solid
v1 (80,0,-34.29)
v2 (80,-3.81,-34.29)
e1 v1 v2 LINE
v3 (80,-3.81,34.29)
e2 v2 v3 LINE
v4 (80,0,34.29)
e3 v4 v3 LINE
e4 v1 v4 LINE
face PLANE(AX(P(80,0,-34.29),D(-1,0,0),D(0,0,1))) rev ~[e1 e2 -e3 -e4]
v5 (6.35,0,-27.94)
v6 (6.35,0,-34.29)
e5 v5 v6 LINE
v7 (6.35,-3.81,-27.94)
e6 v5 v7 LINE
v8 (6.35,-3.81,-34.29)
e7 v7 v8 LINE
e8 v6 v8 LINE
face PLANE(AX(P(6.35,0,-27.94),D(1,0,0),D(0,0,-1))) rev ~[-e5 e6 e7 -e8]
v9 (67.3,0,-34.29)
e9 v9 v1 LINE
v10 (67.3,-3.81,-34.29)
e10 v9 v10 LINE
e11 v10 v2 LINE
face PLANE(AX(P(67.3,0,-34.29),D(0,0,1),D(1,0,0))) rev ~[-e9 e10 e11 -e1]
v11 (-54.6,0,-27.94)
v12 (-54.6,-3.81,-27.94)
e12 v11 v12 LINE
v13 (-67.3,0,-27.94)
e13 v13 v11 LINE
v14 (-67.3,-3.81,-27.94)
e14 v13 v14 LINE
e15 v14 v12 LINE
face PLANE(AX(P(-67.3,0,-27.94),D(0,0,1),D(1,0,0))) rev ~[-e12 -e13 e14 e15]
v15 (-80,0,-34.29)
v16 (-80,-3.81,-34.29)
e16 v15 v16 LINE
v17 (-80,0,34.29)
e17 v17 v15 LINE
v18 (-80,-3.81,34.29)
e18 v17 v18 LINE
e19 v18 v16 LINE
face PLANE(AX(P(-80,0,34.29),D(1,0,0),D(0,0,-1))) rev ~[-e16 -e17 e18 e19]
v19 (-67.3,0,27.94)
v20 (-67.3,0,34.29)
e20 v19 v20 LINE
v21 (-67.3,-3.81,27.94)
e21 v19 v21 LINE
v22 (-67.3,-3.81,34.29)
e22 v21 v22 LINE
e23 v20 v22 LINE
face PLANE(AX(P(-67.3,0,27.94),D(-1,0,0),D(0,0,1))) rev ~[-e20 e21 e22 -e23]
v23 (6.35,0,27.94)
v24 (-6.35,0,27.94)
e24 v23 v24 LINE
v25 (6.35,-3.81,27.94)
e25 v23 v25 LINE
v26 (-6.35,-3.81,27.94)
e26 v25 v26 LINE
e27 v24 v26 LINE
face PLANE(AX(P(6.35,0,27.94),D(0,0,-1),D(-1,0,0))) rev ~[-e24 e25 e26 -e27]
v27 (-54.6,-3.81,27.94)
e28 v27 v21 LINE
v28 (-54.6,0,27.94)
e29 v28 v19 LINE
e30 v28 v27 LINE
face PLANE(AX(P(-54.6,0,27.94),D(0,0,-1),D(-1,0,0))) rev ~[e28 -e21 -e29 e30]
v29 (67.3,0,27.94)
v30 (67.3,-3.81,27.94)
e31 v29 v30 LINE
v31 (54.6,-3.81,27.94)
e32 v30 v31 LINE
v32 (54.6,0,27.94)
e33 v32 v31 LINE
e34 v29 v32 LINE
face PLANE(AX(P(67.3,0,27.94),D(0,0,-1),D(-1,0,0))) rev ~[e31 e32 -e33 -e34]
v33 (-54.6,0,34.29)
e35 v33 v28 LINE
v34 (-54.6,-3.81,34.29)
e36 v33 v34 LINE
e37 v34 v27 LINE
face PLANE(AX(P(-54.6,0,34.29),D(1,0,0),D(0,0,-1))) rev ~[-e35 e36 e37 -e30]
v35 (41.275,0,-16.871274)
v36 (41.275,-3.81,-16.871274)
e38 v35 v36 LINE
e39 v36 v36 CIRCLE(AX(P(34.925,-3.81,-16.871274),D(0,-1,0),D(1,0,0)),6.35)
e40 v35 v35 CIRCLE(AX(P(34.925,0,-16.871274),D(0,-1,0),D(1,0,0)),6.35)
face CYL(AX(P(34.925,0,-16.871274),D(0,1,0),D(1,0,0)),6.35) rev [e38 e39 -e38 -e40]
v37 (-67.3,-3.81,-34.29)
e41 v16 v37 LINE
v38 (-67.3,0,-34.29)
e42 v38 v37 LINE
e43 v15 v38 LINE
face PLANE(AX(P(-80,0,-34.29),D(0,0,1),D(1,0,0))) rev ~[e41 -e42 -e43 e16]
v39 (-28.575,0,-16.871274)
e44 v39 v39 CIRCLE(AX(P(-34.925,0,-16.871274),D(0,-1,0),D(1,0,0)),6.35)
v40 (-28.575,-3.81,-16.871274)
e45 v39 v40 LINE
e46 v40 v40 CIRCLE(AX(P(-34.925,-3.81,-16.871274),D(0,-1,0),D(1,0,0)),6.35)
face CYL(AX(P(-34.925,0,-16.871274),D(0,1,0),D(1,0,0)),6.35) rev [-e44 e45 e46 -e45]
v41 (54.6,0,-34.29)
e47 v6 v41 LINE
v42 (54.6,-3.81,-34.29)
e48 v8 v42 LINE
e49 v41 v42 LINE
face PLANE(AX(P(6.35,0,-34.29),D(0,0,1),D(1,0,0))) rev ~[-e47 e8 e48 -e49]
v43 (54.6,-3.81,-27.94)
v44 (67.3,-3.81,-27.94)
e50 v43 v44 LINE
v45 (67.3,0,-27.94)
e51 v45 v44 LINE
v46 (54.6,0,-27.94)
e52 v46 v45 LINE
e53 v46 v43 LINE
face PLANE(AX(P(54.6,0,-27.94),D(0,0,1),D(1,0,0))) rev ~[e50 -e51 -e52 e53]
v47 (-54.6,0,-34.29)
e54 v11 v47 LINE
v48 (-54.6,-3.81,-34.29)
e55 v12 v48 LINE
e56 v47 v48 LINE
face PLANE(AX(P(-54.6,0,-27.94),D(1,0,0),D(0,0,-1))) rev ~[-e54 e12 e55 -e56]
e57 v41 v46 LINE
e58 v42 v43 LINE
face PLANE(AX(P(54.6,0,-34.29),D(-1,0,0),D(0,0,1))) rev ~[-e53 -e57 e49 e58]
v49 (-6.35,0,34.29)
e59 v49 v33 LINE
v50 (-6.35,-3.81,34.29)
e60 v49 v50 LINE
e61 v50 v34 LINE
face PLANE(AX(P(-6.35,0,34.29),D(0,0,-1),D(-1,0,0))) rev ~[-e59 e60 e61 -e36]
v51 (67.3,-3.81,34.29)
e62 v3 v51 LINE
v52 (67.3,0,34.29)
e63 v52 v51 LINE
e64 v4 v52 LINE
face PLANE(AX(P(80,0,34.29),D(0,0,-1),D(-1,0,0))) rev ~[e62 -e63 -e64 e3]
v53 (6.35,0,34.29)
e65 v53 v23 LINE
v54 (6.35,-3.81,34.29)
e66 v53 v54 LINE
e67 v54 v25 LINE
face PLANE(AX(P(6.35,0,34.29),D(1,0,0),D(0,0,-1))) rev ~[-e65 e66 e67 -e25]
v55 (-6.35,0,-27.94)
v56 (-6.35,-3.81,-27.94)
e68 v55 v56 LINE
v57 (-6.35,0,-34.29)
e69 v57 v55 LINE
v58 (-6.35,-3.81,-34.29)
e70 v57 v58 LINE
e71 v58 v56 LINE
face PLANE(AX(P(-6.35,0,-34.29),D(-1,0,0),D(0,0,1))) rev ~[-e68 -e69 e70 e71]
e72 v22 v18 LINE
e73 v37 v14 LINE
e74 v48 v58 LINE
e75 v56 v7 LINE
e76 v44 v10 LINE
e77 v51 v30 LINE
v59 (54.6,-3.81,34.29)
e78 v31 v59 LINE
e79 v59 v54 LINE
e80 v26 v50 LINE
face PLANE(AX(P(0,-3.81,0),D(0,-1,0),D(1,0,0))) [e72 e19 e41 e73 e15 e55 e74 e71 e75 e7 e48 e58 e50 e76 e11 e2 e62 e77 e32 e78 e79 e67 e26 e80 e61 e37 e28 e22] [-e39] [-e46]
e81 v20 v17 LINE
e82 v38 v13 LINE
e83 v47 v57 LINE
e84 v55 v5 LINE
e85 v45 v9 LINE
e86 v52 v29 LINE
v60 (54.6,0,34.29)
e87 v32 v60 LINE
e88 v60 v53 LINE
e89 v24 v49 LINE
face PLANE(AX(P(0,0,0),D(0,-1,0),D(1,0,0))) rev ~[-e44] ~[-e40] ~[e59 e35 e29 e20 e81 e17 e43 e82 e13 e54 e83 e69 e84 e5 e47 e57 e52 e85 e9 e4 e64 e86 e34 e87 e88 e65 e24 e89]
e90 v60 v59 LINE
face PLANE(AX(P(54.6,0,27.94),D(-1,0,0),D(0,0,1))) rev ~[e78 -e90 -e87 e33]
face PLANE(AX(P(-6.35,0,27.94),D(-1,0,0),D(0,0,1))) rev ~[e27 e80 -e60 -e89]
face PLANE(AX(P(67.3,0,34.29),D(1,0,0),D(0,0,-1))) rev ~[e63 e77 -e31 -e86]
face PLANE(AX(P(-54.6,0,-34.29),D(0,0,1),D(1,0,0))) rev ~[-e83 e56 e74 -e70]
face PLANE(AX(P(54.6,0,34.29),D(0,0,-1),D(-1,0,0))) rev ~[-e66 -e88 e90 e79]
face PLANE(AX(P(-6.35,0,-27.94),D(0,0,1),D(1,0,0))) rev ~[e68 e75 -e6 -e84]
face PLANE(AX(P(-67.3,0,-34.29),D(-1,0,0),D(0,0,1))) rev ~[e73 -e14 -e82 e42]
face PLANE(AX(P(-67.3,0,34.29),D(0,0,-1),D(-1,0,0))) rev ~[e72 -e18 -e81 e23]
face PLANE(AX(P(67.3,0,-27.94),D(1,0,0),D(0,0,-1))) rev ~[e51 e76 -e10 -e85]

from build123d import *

# Parameters (mm, degrees)
F0_R     = 6.35
F1_DEPTH = 3.81


# Not quite as in the source:
# - a feature names something its author has since deleted; it is built from what else it names


with BuildPart() as f1:
    # F0 (on Front) → F1 (new body)
    with BuildSketch(Plane.XZ):
        Polygon((-80, 34.29), (-80, -34.29), (-67.3, -34.29), (-67.3, -27.94), (-54.6, -27.94), (-54.6, -34.29), (-6.35, -34.29), (-6.35, -27.94), (6.35, -27.94), (6.35, -34.29), (54.6, -34.29), (54.6, -27.94), (67.3, -27.94), (67.3, -34.29), (80, -34.29), (80, 34.29), (67.3, 34.29), (67.3, 27.94), (54.6, 27.94), (54.6, 34.29), (6.35, 34.29), (6.35, 27.94), (-6.35, 27.94), (-6.35, 34.29), (-54.6, 34.29), (-54.6, 27.94), (-67.3, 27.94), (-67.3, 34.29), align=None)
        with Locations((-34.925, -16.8712735176)):
            Circle(F0_R, mode=Mode.SUBTRACT)
        with Locations((34.925, -16.8712735176)):
            Circle(F0_R, mode=Mode.SUBTRACT)
    extrude(amount=F1_DEPTH)


solid = f1.part
